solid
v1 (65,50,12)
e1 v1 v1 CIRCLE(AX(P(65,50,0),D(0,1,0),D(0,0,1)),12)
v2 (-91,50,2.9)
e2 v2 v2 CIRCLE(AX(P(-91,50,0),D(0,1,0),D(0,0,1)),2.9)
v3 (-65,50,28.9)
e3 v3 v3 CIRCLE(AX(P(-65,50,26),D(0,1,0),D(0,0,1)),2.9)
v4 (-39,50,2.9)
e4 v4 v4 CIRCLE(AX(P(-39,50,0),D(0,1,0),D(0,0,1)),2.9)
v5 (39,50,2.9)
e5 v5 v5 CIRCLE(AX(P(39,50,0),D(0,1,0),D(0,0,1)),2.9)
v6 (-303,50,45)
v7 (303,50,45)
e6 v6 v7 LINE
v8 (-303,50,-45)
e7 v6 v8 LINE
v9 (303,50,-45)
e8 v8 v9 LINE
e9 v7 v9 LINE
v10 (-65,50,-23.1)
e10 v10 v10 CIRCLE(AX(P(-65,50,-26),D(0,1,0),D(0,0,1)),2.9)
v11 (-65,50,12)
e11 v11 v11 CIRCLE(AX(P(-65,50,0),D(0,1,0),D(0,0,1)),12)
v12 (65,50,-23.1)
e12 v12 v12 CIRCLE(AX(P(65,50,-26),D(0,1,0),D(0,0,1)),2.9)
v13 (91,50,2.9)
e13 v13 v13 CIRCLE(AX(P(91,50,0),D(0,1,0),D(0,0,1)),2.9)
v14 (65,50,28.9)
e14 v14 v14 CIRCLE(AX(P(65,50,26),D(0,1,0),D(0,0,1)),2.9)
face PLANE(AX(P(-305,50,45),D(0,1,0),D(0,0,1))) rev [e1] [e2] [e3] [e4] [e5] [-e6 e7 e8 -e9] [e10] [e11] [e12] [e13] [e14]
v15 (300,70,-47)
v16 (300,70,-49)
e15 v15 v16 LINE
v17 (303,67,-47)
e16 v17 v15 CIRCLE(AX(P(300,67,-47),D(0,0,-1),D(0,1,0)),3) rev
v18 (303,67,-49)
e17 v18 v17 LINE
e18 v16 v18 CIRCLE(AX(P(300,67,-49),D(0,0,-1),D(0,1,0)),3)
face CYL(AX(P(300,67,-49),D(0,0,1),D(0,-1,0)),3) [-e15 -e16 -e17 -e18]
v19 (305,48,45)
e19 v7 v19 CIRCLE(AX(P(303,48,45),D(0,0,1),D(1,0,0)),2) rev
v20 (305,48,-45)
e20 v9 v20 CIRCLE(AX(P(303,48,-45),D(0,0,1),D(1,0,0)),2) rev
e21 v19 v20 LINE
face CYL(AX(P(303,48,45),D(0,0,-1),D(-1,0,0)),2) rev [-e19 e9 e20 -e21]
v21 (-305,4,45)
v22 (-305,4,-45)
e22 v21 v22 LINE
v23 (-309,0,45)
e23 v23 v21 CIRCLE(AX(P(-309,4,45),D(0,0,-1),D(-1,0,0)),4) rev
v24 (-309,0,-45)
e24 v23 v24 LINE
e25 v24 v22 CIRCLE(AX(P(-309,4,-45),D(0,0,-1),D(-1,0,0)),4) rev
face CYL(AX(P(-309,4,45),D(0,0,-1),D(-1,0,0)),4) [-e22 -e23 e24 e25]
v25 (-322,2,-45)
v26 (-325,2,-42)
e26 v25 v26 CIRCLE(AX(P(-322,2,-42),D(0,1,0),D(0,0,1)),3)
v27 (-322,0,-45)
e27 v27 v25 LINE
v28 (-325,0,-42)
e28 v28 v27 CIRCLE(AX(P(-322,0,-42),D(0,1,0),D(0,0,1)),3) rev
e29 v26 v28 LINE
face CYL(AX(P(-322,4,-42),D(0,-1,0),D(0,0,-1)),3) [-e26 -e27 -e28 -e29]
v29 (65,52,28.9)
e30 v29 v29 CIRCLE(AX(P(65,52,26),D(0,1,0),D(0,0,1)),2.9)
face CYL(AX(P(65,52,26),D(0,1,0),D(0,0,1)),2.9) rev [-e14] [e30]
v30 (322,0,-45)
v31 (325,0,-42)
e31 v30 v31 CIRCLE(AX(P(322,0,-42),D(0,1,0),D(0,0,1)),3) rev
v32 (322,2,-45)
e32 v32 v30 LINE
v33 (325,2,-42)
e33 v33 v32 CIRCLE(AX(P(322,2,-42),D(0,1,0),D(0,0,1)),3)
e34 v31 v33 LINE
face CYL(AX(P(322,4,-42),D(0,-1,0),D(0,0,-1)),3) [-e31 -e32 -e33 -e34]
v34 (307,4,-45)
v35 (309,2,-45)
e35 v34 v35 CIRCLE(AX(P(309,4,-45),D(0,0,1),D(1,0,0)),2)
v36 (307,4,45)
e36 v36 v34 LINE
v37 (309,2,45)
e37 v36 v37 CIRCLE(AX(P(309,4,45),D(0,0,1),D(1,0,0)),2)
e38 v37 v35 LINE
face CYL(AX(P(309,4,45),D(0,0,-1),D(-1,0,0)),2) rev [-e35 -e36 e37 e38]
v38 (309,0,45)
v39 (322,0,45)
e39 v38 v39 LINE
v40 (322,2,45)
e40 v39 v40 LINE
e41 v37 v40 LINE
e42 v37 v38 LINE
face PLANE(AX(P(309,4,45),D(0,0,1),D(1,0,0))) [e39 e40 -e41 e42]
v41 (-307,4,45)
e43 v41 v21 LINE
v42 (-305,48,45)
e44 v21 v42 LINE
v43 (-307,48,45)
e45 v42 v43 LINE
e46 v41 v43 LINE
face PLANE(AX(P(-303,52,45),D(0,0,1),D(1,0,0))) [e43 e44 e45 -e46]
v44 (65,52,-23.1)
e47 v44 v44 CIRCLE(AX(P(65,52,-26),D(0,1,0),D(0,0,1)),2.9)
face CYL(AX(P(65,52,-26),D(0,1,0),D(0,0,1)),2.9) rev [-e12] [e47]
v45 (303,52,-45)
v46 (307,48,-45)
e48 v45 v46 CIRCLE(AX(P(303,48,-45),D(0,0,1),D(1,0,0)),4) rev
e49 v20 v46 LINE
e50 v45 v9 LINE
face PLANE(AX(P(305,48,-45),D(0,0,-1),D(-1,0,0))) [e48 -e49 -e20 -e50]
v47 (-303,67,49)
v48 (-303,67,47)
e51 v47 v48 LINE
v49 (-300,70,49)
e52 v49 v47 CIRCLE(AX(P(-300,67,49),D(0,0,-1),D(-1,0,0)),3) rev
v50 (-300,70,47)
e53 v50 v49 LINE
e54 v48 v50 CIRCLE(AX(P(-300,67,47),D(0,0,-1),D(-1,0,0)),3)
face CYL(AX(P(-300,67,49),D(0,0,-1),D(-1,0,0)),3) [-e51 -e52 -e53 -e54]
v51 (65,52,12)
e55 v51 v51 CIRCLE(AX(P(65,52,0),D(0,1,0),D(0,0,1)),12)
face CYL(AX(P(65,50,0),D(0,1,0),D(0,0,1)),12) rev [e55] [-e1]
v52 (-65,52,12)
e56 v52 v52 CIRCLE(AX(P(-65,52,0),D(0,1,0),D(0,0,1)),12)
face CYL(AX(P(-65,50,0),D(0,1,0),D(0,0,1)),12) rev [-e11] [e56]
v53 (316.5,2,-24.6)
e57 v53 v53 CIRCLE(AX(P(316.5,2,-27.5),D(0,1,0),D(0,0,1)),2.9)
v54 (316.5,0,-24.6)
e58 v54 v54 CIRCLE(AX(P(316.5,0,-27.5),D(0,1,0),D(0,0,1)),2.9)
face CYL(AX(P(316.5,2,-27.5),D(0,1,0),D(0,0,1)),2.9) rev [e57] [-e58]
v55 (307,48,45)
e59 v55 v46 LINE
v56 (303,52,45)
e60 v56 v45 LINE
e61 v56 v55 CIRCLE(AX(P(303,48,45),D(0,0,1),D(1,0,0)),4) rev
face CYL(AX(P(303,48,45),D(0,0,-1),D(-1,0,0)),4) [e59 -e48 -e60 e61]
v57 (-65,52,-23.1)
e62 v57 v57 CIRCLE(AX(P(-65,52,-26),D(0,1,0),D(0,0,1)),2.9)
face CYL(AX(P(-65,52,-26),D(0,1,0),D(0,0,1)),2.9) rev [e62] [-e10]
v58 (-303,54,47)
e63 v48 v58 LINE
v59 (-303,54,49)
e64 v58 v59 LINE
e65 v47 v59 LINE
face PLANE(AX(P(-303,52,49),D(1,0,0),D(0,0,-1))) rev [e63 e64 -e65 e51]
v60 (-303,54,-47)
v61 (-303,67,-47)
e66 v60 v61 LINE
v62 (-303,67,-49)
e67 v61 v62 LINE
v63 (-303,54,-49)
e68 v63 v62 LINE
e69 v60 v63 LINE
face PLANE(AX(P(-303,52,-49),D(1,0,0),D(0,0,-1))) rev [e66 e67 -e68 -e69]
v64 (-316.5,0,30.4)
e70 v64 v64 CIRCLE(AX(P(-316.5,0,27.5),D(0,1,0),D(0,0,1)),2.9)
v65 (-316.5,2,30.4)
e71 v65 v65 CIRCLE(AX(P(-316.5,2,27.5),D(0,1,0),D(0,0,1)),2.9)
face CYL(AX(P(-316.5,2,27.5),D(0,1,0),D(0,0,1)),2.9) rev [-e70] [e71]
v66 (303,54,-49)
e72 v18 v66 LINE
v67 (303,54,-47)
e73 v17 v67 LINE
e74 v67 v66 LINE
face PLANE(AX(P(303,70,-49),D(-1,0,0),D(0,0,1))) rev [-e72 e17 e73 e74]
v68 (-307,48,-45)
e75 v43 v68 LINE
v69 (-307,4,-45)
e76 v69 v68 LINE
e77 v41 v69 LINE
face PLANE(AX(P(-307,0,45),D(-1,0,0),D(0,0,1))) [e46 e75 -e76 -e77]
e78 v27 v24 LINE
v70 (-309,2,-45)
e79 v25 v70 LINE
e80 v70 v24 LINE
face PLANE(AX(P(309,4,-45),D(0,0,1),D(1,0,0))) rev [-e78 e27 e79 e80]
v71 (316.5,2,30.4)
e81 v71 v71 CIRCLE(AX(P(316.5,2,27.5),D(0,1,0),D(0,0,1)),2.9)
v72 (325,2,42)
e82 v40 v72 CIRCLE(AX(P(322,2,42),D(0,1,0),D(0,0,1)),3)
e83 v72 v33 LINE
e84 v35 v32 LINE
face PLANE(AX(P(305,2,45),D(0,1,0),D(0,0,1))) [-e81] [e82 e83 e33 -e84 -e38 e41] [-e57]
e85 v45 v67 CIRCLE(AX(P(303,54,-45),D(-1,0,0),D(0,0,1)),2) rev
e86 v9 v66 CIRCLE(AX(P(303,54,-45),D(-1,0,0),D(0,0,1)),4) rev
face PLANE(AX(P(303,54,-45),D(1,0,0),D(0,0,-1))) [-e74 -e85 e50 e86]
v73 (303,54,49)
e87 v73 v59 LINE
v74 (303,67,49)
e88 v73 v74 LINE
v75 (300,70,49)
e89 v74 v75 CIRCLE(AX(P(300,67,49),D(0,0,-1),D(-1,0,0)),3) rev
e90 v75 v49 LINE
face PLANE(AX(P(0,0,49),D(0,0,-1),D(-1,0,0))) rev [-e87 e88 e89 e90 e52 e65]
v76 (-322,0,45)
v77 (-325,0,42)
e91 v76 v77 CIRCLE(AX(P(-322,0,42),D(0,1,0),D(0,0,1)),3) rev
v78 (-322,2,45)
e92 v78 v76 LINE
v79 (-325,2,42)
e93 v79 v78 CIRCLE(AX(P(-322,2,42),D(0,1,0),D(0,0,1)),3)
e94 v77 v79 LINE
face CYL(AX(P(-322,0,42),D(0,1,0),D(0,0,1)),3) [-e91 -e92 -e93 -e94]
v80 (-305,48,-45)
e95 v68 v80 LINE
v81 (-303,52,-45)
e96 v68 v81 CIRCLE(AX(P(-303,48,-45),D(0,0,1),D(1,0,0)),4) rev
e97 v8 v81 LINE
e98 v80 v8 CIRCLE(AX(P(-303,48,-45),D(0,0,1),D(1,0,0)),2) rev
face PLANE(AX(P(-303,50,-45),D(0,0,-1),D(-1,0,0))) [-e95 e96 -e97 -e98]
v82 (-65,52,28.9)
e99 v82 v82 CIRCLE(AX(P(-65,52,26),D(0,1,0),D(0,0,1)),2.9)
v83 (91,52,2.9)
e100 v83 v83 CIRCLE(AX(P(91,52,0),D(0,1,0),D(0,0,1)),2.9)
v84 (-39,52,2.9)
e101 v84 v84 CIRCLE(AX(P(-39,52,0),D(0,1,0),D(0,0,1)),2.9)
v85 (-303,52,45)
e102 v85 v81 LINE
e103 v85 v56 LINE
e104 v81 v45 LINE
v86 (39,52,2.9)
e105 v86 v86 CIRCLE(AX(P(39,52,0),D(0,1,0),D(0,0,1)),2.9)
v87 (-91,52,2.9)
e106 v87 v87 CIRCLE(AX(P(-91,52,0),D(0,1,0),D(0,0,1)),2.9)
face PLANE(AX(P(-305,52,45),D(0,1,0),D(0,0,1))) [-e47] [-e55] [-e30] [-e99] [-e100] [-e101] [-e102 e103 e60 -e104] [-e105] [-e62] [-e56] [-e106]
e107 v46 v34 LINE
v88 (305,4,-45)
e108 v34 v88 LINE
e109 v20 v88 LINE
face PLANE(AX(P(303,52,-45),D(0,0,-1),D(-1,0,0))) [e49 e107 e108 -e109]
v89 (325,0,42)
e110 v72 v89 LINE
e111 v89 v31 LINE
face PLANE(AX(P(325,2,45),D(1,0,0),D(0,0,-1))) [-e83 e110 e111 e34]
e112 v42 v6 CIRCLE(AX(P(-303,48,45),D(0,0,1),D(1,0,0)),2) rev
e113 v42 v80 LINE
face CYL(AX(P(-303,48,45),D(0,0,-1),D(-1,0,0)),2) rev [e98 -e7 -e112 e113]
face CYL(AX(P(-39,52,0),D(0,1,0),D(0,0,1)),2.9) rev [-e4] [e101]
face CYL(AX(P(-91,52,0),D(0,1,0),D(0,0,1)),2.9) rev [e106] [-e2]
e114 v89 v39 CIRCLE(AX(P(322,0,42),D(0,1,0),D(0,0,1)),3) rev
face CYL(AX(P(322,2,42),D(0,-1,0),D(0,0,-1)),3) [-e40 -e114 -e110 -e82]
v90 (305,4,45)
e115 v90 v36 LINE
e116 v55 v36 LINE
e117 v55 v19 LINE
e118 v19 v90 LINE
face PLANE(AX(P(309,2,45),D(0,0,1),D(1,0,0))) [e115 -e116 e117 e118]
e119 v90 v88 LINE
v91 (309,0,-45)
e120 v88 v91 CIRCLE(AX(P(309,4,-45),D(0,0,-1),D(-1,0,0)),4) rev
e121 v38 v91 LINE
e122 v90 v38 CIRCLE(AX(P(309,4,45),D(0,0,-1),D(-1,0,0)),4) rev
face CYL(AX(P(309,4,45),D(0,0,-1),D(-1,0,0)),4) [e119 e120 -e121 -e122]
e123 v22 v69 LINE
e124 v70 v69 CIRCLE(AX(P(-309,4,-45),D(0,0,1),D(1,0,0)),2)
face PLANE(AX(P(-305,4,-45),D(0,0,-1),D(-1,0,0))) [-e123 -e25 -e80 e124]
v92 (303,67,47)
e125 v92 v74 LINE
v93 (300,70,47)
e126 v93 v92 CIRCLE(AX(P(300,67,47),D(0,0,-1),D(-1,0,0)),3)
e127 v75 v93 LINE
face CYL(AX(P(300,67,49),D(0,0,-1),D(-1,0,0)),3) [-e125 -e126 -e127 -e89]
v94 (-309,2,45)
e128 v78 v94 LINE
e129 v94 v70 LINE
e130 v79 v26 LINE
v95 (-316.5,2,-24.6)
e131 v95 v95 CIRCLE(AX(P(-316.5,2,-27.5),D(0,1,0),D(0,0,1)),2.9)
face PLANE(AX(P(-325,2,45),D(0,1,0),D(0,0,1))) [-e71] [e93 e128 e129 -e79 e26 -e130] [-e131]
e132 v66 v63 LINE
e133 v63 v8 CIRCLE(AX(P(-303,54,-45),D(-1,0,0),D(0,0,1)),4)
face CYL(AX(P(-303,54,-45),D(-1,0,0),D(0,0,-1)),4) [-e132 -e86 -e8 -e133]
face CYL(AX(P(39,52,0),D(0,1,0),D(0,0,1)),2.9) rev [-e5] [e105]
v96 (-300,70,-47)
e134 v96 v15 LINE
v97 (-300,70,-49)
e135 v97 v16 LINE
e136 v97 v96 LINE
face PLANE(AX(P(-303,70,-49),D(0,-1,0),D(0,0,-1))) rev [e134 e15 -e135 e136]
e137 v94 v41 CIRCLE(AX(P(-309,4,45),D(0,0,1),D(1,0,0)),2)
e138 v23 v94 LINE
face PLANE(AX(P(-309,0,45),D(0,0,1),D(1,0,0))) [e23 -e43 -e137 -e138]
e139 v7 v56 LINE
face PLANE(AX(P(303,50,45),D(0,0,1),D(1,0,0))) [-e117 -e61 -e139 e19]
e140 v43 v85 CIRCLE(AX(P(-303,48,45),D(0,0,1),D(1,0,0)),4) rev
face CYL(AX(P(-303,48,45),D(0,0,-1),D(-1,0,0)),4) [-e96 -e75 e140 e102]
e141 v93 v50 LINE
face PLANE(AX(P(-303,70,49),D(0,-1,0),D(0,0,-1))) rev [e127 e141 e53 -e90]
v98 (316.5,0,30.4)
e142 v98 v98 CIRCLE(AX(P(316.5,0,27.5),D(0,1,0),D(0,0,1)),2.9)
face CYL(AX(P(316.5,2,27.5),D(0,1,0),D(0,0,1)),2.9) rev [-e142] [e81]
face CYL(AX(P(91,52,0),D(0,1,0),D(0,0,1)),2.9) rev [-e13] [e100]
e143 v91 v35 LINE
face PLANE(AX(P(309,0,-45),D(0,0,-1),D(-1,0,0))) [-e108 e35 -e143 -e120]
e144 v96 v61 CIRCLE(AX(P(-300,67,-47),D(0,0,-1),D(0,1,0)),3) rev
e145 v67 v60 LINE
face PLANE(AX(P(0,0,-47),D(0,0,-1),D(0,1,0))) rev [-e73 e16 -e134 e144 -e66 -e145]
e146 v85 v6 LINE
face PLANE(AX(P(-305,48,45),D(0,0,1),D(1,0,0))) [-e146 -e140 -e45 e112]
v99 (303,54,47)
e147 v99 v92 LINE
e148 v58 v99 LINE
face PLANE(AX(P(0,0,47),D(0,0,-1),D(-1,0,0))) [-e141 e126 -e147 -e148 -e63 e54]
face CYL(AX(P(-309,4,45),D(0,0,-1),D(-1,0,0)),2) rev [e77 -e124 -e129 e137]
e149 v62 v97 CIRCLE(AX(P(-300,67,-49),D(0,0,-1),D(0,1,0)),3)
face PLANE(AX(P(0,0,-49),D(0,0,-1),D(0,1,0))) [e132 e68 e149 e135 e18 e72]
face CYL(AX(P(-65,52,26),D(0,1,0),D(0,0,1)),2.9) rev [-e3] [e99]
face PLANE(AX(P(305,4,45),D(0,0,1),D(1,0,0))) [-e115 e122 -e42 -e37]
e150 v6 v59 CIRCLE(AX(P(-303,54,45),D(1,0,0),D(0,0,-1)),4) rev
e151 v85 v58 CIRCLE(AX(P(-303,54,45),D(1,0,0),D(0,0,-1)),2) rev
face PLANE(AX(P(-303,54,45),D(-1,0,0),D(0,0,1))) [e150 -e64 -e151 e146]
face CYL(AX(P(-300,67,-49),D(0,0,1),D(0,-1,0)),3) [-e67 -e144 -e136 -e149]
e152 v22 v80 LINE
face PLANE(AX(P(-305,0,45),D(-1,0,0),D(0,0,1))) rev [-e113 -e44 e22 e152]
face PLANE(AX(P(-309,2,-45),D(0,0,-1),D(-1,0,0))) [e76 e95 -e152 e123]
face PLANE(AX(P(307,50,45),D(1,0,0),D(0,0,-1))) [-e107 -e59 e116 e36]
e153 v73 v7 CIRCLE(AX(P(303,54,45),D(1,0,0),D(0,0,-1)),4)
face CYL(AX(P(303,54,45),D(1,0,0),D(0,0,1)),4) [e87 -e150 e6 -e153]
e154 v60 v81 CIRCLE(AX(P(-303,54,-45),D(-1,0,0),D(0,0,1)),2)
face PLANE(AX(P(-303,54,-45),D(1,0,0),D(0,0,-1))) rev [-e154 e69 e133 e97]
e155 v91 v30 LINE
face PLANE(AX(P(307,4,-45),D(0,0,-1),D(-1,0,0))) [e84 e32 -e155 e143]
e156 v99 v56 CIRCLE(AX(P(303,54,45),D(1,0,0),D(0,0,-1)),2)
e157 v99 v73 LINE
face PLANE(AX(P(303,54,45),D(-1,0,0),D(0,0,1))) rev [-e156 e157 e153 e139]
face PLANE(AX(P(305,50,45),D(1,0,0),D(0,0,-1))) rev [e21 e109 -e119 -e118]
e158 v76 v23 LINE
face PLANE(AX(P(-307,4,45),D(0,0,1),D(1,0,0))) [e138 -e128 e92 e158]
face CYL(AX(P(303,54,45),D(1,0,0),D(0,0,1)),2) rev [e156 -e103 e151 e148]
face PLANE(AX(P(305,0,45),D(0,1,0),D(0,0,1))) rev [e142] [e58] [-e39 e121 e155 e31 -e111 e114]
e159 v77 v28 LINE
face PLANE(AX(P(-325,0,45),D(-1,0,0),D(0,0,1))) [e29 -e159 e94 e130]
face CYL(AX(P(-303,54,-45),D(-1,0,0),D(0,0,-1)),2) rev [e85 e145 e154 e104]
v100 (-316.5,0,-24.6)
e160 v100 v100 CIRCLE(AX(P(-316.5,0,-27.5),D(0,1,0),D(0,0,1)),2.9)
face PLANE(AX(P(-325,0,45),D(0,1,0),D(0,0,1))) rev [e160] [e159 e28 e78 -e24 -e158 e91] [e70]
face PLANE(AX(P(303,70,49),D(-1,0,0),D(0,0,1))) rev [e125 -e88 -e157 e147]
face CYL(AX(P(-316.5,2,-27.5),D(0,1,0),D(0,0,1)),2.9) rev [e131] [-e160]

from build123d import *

# Parameters (mm, degrees)
BASE_FLANGE1_DEPTH      = 45
EDGE_FLANGE1_DEPTH      = 606
EDGE_FLANGE1_BEND_DEPTH = 606
SKETCH11_R              = 12
CUT_EXTRUDE1_DEPTH      = 10
FILLET1_R               = 3
M5_CLEARANCE_HOLE1_D    = 5.8
M5_CLEARANCE_HOLE2_D    = 5.8


# Sheet-metal steps are written as plain solids
with BuildPart() as part:
    # Sketch1 → Base-Flange1 (new, symmetric)
    with BuildSketch(Plane.XY):
        with BuildLine():
            Line((-325, 0), (-309, 0))
            ThreePointArc((-309, 0), (-306.171572875, 1.171572875), (-305, 4))
            Line((-305, 4), (-305, 48))
            ThreePointArc((-305, 48), (-304.414213562, 49.414213562), (-303, 50))
            Line((-303, 50), (303, 50))
            ThreePointArc((303, 50), (304.414213562, 49.414213562), (305, 48))
            Line((305, 48), (305, 4))
            ThreePointArc((305, 4), (306.171572875, 1.171572875), (309, 0))
            Line((309, 0), (325, 0))
            Line((325, 0), (325, 2))
            Line((325, 2), (309, 2))
            ThreePointArc((309, 2), (307.585786438, 2.585786438), (307, 4))
            Line((307, 4), (307, 48))
            ThreePointArc((307, 48), (305.828427125, 50.828427125), (303, 52))
            Line((303, 52), (-303, 52))
            ThreePointArc((-303, 52), (-305.828427125, 50.828427125), (-307, 48))
            Line((-307, 48), (-307, 4))
            ThreePointArc((-307, 4), (-307.585786438, 2.585786438), (-309, 2))
            Line((-309, 2), (-325, 2))
            Line((-325, 2), (-325, 0))
        make_face()
    extrude(amount=BASE_FLANGE1_DEPTH, both=True)

    # Edge-Flange1 section (across the edge) → Edge-Flange1 (add)
    with BuildSketch(Plane(origin=(303, 52, -47), x_dir=(0, 0, 1), z_dir=(-1, 0, 0))):
        with BuildLine():
            Line((-2, 2), (-2, 18))
            Line((-2, 18), (0, 18))
            Line((0, 18), (0, 2))
            ThreePointArc((0, 2), (0.585786438, 0.585786438), (2, 0))
            Line((2, 0), (2, -2))
            ThreePointArc((2, -2), (-0.828427125, -0.828427125), (-2, 2))
        make_face()
    extrude(amount=EDGE_FLANGE1_DEPTH)

    # Edge-Flange1 section 2 (across the edge) → Edge-Flange1 bend (add)
    with BuildSketch(Plane(origin=(-303, 52, 47), x_dir=(0, 0, -1), z_dir=(1, 0, 0))):
        with BuildLine():
            Line((-2, 2), (-2, 18))
            Line((-2, 18), (0, 18))
            Line((0, 18), (0, 2))
            ThreePointArc((0, 2), (0.585786438, 0.585786438), (2, 0))
            Line((2, 0), (2, -2))
            ThreePointArc((2, -2), (-0.828427125, -0.828427125), (-2, 2))
        make_face()
    extrude(amount=EDGE_FLANGE1_BEND_DEPTH)

    # Sketch11 → Cut-Extrude1 (cut)
    with BuildSketch(Plane(origin=(0, 52, 0), x_dir=(1, 0, 0), z_dir=(0, 1, 0))):
        with Locations(Location((-65, 0, 0), (0, 0, 270))):
            Circle(SKETCH11_R)
        with Locations(Location((65, 0, 0), (0, 0, 270))):
            Circle(SKETCH11_R)
    extrude(amount=-CUT_EXTRUDE1_DEPTH, mode=Mode.SUBTRACT)

    # Fillet1
    fillet1_edges = [part.edges().sort_by_distance(p)[0] for p in [
        (-325, 1, -45),
        (325, 1, -45),
        (-325, 1, 45),
        (303, 70, -48),
        (-303, 70, -48),
        (325, 1, 45),
        (-303, 70, 48),
        (303, 70, 48),
    ]]
    fillet(fillet1_edges, radius=FILLET1_R)

    # M5 Clearance Hole1 (through all)
    with Locations(Plane(origin=(0, 2, 0), x_dir=(1, 0, 0), z_dir=(0, 1, 0))):
        with Locations((316.5, 27.5), (316.5, -27.5)):
            m5_clearance_hole1 = Hole(M5_CLEARANCE_HOLE1_D / 2)

    # Mirror1: M5 Clearance Hole1 across plane
    add(m5_clearance_hole1.mirror(Plane(origin=(0, 0, 0), x_dir=(0, 0, 1), z_dir=(1, 0, 0))), mode=Mode.SUBTRACT)

    # M5 Clearance Hole2 (through all)
    with Locations(Plane(origin=(0, 52, 0), x_dir=(1, 0, 0), z_dir=(0, 1, 0))):
        with Locations((-91, 0), (-65, 26), (-39, 0), (-65, -26)):
            m5_clearance_hole2 = Hole(M5_CLEARANCE_HOLE2_D / 2)

    # Mirror2: M5 Clearance Hole2 across plane
    add(m5_clearance_hole2.mirror(Plane(origin=(0, 0, 0), x_dir=(0, 0, 1), z_dir=(1, 0, 0))), mode=Mode.SUBTRACT)


solid = part.part
